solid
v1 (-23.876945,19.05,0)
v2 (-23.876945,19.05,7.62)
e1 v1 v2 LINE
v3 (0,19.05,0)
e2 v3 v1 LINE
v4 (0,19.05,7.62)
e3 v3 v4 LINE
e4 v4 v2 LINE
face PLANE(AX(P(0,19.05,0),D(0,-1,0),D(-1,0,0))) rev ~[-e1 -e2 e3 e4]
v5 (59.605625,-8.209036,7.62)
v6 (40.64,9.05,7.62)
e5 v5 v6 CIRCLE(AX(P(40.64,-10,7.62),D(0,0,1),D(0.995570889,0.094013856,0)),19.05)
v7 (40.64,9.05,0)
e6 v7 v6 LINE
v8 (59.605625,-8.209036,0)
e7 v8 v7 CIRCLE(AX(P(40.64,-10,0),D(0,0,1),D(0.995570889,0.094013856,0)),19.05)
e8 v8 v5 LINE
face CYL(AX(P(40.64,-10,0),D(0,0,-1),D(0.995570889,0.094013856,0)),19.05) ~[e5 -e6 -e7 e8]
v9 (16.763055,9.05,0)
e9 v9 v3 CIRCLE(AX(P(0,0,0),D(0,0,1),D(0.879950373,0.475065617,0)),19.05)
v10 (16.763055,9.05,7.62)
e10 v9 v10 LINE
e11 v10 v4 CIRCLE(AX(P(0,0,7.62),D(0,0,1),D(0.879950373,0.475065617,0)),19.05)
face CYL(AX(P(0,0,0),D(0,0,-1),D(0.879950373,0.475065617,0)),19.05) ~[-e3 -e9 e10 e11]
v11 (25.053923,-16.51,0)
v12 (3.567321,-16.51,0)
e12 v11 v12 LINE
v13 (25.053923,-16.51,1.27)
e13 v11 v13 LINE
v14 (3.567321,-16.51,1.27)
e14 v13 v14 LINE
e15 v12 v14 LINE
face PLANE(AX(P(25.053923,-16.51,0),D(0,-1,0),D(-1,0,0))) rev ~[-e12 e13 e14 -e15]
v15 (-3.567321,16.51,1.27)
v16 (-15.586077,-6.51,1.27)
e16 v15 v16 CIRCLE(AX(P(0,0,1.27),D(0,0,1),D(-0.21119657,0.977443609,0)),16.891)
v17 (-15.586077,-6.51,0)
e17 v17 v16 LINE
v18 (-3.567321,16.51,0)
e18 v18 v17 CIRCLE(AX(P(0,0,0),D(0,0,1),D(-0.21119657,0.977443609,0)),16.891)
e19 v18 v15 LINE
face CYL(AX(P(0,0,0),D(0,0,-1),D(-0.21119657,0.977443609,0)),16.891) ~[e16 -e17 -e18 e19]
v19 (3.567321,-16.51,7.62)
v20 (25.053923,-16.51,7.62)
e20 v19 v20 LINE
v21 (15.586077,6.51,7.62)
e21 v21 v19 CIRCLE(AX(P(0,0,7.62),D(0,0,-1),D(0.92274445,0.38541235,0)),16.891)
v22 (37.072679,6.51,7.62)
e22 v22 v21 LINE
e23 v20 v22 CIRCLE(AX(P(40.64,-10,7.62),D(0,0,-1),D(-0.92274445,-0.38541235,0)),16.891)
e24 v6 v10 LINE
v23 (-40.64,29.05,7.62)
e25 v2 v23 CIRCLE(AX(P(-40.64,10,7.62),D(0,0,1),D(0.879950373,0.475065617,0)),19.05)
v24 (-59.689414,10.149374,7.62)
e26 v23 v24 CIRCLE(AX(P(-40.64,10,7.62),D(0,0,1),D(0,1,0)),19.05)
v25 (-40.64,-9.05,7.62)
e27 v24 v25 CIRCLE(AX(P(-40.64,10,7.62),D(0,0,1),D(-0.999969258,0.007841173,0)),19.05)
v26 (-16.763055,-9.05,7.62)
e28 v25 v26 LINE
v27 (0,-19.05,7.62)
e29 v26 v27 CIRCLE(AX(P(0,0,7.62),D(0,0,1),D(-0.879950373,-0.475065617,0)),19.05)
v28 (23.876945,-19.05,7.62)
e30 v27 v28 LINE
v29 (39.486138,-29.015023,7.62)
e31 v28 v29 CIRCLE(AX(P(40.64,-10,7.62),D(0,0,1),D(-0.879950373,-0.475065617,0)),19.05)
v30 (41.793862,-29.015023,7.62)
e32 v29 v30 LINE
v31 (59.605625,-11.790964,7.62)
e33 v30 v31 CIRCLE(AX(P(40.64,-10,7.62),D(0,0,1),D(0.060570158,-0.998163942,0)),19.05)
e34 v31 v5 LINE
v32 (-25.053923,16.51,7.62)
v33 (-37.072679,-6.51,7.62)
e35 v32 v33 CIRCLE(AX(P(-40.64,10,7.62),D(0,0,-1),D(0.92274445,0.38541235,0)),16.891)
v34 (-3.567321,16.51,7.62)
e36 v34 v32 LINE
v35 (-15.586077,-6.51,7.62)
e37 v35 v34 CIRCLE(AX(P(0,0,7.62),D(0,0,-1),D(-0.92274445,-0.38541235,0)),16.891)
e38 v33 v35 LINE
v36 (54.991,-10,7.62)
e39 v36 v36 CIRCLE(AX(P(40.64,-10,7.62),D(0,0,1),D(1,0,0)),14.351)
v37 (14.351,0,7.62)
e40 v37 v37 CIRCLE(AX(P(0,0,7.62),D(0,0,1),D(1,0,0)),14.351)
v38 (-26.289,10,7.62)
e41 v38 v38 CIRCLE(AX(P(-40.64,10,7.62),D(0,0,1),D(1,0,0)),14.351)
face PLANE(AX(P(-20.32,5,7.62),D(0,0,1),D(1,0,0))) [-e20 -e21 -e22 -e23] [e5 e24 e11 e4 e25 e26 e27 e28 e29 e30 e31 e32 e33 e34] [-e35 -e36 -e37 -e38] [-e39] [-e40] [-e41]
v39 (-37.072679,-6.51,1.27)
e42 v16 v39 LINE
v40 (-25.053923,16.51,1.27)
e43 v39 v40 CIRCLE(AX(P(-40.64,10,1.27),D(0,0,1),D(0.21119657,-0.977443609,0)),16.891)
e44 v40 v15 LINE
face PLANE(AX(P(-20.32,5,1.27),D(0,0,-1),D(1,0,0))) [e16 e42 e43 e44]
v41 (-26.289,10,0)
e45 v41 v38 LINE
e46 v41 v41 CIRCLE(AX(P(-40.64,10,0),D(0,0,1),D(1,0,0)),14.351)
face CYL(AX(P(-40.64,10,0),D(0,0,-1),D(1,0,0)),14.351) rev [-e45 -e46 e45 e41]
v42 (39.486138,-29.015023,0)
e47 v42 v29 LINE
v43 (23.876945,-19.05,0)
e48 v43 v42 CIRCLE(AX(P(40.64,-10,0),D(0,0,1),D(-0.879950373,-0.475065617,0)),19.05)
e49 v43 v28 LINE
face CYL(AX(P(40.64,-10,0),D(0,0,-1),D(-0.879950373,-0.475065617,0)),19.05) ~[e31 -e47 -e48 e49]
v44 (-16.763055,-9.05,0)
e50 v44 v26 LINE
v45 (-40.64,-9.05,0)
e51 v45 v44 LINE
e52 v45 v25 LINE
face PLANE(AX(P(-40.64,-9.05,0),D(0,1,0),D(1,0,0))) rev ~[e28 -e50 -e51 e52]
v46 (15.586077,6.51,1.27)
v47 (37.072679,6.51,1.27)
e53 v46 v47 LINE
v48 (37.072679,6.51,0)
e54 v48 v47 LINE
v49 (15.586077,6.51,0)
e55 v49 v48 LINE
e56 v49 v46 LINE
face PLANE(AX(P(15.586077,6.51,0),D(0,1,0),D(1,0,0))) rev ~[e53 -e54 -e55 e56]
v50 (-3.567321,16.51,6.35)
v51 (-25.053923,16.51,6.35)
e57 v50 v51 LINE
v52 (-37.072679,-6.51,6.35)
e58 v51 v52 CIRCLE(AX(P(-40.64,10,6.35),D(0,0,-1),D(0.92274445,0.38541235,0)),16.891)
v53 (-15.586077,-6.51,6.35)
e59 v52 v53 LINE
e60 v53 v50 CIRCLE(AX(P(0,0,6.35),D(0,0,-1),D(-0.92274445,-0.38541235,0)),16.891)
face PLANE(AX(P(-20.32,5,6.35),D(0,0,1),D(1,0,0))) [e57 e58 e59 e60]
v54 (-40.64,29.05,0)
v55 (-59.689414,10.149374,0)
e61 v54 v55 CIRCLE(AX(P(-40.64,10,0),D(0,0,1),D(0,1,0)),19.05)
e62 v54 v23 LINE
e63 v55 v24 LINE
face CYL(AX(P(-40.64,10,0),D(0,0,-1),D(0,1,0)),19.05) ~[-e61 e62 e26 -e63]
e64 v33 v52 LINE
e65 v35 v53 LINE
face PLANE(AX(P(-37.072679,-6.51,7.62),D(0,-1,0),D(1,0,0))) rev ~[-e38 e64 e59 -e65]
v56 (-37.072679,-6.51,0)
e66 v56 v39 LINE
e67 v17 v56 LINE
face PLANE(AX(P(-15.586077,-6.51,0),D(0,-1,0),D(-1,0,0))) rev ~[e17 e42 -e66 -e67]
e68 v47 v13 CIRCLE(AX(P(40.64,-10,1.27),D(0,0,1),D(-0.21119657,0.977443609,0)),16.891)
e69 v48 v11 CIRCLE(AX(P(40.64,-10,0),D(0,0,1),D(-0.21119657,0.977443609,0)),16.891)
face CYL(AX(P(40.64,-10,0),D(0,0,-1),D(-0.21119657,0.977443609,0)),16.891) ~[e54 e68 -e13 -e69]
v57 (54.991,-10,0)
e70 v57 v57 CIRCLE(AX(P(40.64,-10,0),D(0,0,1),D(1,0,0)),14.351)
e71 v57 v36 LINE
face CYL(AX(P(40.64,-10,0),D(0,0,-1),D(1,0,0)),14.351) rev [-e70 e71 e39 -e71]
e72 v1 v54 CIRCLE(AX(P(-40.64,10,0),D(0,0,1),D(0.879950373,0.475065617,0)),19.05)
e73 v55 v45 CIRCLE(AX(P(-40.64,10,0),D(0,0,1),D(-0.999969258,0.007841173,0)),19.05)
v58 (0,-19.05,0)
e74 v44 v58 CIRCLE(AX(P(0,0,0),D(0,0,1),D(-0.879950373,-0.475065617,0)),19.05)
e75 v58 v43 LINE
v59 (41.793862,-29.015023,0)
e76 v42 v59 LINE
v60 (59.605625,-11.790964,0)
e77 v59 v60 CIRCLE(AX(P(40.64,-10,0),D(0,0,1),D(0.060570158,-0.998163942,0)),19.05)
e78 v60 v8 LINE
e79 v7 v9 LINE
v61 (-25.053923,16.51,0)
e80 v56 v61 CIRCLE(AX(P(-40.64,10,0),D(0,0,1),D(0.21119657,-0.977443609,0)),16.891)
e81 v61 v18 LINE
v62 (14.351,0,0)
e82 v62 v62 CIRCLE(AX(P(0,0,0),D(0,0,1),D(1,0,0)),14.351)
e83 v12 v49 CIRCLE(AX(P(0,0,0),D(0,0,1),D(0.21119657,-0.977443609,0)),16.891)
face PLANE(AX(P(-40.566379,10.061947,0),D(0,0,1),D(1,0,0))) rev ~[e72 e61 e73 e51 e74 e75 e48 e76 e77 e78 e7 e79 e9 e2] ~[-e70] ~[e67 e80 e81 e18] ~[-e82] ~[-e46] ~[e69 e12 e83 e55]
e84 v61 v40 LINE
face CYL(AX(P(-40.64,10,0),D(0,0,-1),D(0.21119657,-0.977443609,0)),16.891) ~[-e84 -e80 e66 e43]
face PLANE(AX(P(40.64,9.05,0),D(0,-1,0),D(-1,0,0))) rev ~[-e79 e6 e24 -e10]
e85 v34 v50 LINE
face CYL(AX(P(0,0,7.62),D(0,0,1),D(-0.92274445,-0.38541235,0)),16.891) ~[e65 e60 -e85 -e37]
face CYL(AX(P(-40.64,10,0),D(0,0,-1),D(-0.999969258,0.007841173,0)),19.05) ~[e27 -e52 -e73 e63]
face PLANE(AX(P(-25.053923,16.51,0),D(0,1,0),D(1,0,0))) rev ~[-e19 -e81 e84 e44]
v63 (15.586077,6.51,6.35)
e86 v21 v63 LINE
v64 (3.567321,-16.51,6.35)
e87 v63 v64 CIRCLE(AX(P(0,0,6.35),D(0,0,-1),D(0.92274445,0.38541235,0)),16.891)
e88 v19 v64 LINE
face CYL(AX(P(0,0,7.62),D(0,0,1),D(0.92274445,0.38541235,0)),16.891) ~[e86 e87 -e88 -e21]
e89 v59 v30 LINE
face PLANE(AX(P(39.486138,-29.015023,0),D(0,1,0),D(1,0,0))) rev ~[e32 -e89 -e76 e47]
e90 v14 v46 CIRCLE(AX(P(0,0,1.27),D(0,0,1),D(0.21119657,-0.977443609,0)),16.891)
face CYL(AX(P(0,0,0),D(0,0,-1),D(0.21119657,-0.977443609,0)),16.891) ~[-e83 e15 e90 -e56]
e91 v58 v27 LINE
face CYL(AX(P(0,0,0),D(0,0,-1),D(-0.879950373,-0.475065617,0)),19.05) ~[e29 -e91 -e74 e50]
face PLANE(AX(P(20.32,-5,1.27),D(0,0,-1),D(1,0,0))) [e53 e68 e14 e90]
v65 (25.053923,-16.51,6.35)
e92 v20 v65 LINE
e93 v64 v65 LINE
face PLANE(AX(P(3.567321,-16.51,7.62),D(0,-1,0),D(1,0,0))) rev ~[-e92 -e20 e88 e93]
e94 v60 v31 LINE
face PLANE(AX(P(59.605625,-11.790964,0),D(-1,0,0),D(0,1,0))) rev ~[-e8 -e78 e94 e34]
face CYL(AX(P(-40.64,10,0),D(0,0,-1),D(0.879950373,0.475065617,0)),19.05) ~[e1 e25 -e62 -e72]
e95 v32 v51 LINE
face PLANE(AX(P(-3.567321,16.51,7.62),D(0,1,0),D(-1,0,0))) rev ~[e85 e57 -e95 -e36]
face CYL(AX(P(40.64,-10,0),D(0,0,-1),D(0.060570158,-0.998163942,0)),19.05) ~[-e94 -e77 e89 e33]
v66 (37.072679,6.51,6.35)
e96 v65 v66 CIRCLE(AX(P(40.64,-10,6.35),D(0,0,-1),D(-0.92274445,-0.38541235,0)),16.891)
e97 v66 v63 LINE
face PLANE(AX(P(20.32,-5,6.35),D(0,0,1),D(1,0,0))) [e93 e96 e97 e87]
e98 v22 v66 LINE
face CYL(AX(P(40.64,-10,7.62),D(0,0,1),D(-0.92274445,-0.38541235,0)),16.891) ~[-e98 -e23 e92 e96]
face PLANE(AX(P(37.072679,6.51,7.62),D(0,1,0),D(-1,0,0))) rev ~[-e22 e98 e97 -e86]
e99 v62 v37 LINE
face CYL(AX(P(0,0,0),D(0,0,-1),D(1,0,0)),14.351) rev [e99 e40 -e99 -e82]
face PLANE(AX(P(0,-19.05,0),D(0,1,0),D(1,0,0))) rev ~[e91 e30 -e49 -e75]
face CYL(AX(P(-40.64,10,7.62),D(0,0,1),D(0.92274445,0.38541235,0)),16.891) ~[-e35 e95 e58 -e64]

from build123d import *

# Parameters (mm, degrees)
F0_R        = 14.351
F1_DEPTH    = 7.62
F2_T        = 2.54
F2_T3_DEPTH = 12.7
F4_DEPTH    = 7.62
F5_DEPTH    = 1.27
F7_DEPTH    = 1.27


# Not quite as in the source:
# - a shell that OpenCascade refuses in one call is made with other operations: the cavity is built on its own and cut out


with BuildPart() as f1:
    # F0 (on Top) → F1 (new body)
    with BuildSketch(Plane.XY):
        with BuildLine():
            ThreePointArc((-40.64, -9.05), (-27.1696158184, -3.4703841816), (-21.59, 10))
            ThreePointArc((-21.59, 10), (-22.1705835176, 14.6672427406), (-23.8769453858, 19.05))
            ThreePointArc((-23.8769453858, 19.05), (-30.880389352, 26.3600886306), (-40.64, 29.05))
            ThreePointArc((-40.64, 29.05), (-54.0574684375, 23.5230928684), (-59.6894143559, 10.1493743547))
            ThreePointArc((-59.6894143559, 10.1493743547), (-54.1630928684, -3.4174684375), (-40.64, -9.05))
        make_face()
        with Locations((-40.64, 10)):
            Circle(F0_R, mode=Mode.SUBTRACT)
        with BuildLine():
            ThreePointArc((-23.8769453858, 19.05), (-22.1705835176, 14.6672427406), (-21.59, 10))
            ThreePointArc((-21.59, 10), (-27.1696158184, -3.4703841816), (-40.64, -9.05))
            Line((-40.64, -9.05), (-16.7630546142, -9.05))
            ThreePointArc((-16.7630546142, -9.05), (-16.3600886306, 9.759610648), (0, 19.05))
            Line((0, 19.05), (-23.8769453858, 19.05))
        make_face()
        with BuildLine():
            ThreePointArc((16.7630546142, 9.05), (9.759610648, 16.3600886306), (0, 19.05))
            ThreePointArc((0, 19.05), (-16.3600886306, 9.759610648), (-16.7630546142, -9.05))
            ThreePointArc((-16.7630546142, -9.05), (-9.759610648, -16.3600886306), (0, -19.05))
            ThreePointArc((0, -19.05), (13.4703841816, -13.4703841816), (19.05, 0))
            ThreePointArc((19.05, 0), (18.4694164824, 4.6672427406), (16.7630546142, 9.05))
        make_face()
        Circle(F0_R, mode=Mode.SUBTRACT)
        with BuildLine():
            Line((40.64, 9.05), (16.7630546142, 9.05))
            ThreePointArc((16.7630546142, 9.05), (18.4694164824, 4.6672427406), (19.05, 0))
            ThreePointArc((19.05, 0), (13.4703841816, -13.4703841816), (0, -19.05))
            Line((0, -19.05), (23.8769453858, -19.05))
            ThreePointArc((23.8769453858, -19.05), (24.2799113694, -0.240389352), (40.64, 9.05))
        make_face()
        with BuildLine():
            ThreePointArc((59.6056254338, -8.2090360401), (53.4615567808, 4.0893641346), (40.64, 9.05))
            ThreePointArc((40.64, 9.05), (24.2799113694, -0.240389352), (23.8769453858, -19.05))
            ThreePointArc((23.8769453858, -19.05), (30.3891760199, -26.0568710442), (39.4861384834, -29.0150231028))
            Line((39.4861384834, -29.0150231028), (41.7938615166, -29.0150231028))
            ThreePointArc((41.7938615166, -29.0150231028), (53.8825636539, -23.6944152074), (59.6056254338, -11.7909639599))
            Line((59.6056254338, -11.7909639599), (59.6056254338, -8.2090360401))
        make_face()
        with Locations((40.64, -10)):
            Circle(F0_R, mode=Mode.SUBTRACT)
    extrude(amount=F1_DEPTH)

    # F2: shell of thickness 2.54, made by hand


with BuildPart() as f2_core1:
    # F2_t2: copy of F1
    add(f1.part)

    # the walls: a layer under each face that stays
    f2_faces = [f2_core1.faces().sort_by_distance(p)[0] for p in [
        (-57.0000886306, 19.759610648, 3.81),
        (-28.7015273071, -9.05, 3.81),
        (-9.759610648, -16.3600886306, 3.81),
        (11.9384726929, -19.05, 3.81),
        (30.3891760199, -26.0568710442, 3.81),
        (40.64, -29.0150231028, 3.81),
        (53.8825636539, -23.6944152074, 3.81),
        (59.6056254338, -10, 3.81),
        (53.4615567808, 4.0893641346, 3.81),
        (28.7015273071, 9.05, 3.81),
        (9.759610648, 16.3600886306, 3.81),
        (-11.9384726929, 19.05, 3.81),
        (-54.991, 10, 3.81),
        (-14.351, 0, 3.81),
        (26.289, -10, 3.81),
        (-51.1688838976, 0.0174884486, 0),
    ]]
    thicken(f2_faces, amount=-F2_T, mode=Mode.SUBTRACT)

    # F2_s4 → F2_t3 (cut)
    with BuildSketch(Plane.XY.offset(-2.54)):
        Polygon((-23.8545946463, 19.0874666667), (-26.1120193343, 17.8433333333), (-25.3921823509, 16.51), (-23.8769453858, 16.51), align=None)
        Polygon((-16.7854053537, -9.0874666667), (-16.7630546142, -6.51), (-15.2478176491, -6.51), (-14.5279806657, -7.8433333333), align=None)
        Polygon((23.8545946463, -19.0874666667), (23.8769453858, -16.51), (25.3921823509, -16.51), (26.1120193343, -17.8433333333), align=None)
        Polygon((16.7854053537, 9.0874666667), (16.7630546142, 6.51), (15.2478176491, 6.51), (14.5279806657, 7.8433333333), align=None)
    extrude(amount=F2_T3_DEPTH, mode=Mode.SUBTRACT)


with BuildPart() as f1_1:
    add(f1.part)

    # what is left inside the walls is the cavity
    f2_cavity = [f2_core1.part.solids().sort_by_distance(p)[0] for p in [
        (-20.32, 1.163333, 7.5946),
        (20.32, -8.836667, 7.5946),
    ]]
    add(f2_cavity, mode=Mode.SUBTRACT)

    # F3 (on face) → F4 (join)
    with BuildSketch(Plane.XY.offset(7.62)):
        with BuildLine():
            ThreePointArc((-15.5860765108, -6.51), (-14.9730845713, 7.8174560709), (-3.5673212639, 16.51))
            Line((-3.5673212639, 16.51), (-25.0539234892, 16.51))
            ThreePointArc((-25.0539234892, 16.51), (-25.6669154287, 2.1825439291), (-37.0726787361, -6.51))
            Line((-37.0726787361, -6.51), (-15.5860765108, -6.51))
        make_face()
        with BuildLine():
            ThreePointArc((25.0539234892, -16.51), (25.6669154287, -2.1825439291), (37.0726787361, 6.51))
            Line((37.0726787361, 6.51), (15.5860765108, 6.51))
            ThreePointArc((15.5860765108, 6.51), (14.9730845713, -7.8174560709), (3.5673212639, -16.51))
            Line((3.5673212639, -16.51), (25.0539234892, -16.51))
        make_face()
    extrude(amount=-F4_DEPTH)

    # F3 (on face) → F5 (cut)
    with BuildSketch(Plane.XY.offset(7.62)):
        with BuildLine():
            ThreePointArc((-15.5860765108, -6.51), (-14.9730845713, 7.8174560709), (-3.5673212639, 16.51))
            Line((-3.5673212639, 16.51), (-25.0539234892, 16.51))
            ThreePointArc((-25.0539234892, 16.51), (-25.6669154287, 2.1825439291), (-37.0726787361, -6.51))
            Line((-37.0726787361, -6.51), (-15.5860765108, -6.51))
        make_face()
        with BuildLine():
            ThreePointArc((25.0539234892, -16.51), (25.6669154287, -2.1825439291), (37.0726787361, 6.51))
            Line((37.0726787361, 6.51), (15.5860765108, 6.51))
            ThreePointArc((15.5860765108, 6.51), (14.9730845713, -7.8174560709), (3.5673212639, -16.51))
            Line((3.5673212639, -16.51), (25.0539234892, -16.51))
        make_face()
    extrude(amount=-F5_DEPTH, mode=Mode.SUBTRACT)

    # F6 (on face) → F7 (cut)
    with BuildSketch(Plane(origin=(0, 0, 0), x_dir=(1, 0, 0), z_dir=(0, 0, -1))):
        with BuildLine():
            Line((-15.5860765108, 6.51), (-37.0726787361, 6.51))
            ThreePointArc((-37.0726787361, 6.51), (-25.6669154287, -2.1825439291), (-25.0539234892, -16.51))
            Line((-25.0539234892, -16.51), (-3.5673212639, -16.51))
            ThreePointArc((-3.5673212639, -16.51), (-14.9730845713, -7.8174560709), (-15.5860765108, 6.51))
        make_face()
        with BuildLine():
            Line((15.5860765108, -6.51), (37.0726787361, -6.51))
            ThreePointArc((37.0726787361, -6.51), (25.6669154287, 2.1825439291), (25.0539234892, 16.51))
            Line((25.0539234892, 16.51), (3.5673212639, 16.51))
            ThreePointArc((3.5673212639, 16.51), (14.9730845713, 7.8174560709), (15.5860765108, -6.51))
        make_face()
    extrude(amount=-F7_DEPTH, mode=Mode.SUBTRACT)


solid = f1_1.part
